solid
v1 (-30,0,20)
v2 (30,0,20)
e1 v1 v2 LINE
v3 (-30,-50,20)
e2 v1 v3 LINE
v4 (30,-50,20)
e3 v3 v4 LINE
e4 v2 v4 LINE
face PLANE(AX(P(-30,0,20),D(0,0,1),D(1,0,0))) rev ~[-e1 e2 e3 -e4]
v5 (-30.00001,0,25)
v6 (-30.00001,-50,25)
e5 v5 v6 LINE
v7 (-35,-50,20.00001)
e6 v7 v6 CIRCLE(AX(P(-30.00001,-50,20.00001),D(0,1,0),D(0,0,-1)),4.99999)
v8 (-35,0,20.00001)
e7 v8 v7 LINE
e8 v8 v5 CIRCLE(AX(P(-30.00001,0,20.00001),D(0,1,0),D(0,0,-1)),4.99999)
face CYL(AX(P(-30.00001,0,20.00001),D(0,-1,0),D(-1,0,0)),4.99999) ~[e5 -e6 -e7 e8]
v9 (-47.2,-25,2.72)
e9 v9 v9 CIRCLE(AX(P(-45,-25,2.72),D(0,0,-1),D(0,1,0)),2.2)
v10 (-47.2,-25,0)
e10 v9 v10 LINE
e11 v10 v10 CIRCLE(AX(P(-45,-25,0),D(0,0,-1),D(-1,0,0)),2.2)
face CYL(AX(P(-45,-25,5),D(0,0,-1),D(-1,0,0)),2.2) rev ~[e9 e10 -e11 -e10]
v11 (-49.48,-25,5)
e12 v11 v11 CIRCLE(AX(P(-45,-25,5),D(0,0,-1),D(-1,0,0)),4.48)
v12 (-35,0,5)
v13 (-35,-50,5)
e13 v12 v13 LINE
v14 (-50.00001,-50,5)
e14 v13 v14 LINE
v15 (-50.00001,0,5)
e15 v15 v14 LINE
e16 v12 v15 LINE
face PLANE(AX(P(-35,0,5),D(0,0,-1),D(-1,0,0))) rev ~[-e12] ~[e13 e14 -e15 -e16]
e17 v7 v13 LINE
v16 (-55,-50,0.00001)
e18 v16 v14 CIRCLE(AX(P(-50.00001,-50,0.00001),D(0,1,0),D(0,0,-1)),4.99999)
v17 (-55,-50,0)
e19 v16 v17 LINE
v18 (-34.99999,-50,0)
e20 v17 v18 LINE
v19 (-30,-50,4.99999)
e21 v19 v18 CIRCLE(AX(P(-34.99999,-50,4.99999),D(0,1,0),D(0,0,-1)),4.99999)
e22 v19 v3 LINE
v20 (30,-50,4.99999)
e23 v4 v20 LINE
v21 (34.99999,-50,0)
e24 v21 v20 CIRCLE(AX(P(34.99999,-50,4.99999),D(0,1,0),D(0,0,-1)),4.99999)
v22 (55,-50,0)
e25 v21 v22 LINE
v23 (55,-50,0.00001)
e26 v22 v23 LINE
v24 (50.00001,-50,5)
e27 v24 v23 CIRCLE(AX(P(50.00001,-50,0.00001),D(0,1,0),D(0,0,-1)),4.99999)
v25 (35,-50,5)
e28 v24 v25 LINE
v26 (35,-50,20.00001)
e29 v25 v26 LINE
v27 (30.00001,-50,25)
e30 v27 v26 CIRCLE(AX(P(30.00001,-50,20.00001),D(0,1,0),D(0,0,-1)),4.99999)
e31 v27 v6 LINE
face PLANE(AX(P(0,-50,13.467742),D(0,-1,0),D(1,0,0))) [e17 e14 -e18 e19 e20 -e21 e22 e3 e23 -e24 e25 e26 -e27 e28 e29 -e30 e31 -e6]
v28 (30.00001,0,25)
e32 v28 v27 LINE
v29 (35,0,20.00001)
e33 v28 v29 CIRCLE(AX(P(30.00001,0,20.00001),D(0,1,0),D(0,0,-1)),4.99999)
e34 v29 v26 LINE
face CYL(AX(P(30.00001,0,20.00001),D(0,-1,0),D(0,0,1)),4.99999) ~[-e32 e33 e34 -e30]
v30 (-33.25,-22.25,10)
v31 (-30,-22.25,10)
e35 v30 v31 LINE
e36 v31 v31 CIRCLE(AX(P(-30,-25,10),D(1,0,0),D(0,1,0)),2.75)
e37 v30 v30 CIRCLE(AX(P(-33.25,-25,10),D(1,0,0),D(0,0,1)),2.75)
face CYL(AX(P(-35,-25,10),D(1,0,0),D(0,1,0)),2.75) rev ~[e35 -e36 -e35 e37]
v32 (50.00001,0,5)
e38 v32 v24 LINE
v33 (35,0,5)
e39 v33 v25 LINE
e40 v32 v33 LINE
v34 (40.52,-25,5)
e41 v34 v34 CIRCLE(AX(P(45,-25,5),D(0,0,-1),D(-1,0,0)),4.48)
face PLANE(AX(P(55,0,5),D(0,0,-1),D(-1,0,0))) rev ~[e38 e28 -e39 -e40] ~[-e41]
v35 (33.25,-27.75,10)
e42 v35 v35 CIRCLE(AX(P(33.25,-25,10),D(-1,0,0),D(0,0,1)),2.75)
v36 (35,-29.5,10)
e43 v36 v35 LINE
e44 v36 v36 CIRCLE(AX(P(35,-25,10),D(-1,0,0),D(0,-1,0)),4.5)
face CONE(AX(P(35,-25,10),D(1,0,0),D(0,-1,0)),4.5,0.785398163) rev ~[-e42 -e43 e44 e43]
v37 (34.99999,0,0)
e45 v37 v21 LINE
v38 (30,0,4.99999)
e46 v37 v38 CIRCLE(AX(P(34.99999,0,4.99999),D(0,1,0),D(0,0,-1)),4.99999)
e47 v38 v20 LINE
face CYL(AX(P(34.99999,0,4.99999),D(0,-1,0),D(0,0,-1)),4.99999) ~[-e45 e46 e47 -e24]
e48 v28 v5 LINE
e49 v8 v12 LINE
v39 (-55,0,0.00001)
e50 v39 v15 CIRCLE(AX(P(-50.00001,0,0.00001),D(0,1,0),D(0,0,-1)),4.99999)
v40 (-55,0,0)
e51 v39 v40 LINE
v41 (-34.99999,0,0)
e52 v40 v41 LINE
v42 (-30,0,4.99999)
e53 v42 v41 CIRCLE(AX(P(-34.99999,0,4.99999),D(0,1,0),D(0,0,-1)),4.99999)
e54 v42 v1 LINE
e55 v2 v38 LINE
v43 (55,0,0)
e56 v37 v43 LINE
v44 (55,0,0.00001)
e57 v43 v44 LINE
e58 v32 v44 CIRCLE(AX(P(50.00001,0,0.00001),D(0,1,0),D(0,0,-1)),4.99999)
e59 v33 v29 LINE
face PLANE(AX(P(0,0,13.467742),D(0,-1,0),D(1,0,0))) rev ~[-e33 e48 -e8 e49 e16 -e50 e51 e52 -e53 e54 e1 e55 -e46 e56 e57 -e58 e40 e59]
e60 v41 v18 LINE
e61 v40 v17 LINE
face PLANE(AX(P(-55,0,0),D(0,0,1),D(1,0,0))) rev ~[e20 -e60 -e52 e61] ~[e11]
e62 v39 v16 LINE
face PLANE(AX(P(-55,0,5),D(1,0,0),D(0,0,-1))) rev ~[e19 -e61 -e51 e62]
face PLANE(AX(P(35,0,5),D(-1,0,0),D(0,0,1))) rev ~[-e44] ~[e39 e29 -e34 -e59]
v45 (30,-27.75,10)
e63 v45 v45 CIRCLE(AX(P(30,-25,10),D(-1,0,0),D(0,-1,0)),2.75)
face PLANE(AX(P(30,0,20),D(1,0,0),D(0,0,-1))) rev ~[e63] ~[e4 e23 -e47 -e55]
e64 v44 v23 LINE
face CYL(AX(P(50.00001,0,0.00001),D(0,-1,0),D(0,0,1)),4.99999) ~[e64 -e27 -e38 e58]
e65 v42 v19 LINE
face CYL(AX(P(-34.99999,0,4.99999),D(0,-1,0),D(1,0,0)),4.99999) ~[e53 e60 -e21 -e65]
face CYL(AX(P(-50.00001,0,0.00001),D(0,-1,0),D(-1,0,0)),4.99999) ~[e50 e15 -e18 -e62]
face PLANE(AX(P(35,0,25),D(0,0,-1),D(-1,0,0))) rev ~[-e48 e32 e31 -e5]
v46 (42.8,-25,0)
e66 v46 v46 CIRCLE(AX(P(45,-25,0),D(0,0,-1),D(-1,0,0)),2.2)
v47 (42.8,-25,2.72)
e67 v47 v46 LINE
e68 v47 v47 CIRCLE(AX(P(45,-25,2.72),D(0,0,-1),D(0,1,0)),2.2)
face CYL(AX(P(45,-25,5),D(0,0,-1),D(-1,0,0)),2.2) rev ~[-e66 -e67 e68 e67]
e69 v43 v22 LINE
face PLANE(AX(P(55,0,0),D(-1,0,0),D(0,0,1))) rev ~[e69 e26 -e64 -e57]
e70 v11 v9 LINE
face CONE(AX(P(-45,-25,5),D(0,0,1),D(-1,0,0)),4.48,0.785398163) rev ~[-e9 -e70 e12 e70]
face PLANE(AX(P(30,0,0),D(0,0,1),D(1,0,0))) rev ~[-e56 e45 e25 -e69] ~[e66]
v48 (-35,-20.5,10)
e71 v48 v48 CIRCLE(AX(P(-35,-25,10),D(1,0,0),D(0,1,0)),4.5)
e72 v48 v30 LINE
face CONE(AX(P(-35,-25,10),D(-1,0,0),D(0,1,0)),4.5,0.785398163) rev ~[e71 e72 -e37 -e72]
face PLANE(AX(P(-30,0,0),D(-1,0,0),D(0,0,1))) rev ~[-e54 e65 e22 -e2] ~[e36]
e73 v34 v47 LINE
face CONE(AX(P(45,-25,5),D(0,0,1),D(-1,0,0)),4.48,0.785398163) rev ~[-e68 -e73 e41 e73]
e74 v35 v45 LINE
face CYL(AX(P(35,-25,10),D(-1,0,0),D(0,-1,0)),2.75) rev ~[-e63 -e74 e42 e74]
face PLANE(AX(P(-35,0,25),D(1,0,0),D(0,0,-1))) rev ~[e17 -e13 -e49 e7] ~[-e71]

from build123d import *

# Parameters (mm, degrees)
F1_DEPTH             = 50
F4_D                 = 4.4
F4_CSINK_D           = 8.96
F4_CSINK_ANGLE       = 90
F4_ON_F3_D           = 4.4
F4_ON_F3_CSINK_D     = 8.96
F4_ON_F3_CSINK_ANGLE = 90
F6_D                 = 5.5
F6_DEPTH             = 5
F6_CSINK_D           = 9
F6_CSINK_ANGLE       = 90
F6_TIP               = 1.6523667023
F8_D                 = 5.5
F8_DEPTH             = 5
F8_CSINK_D           = 9
F8_CSINK_ANGLE       = 90
F8_TIP               = 1.6523667023
F9_R                 = 4.99999


# Not quite as in the source:
# - a fillet or chamfer is up to 0.001 mm smaller than in the source, because OpenCascade refuses the exact size


with BuildPart() as f1:
    # F0 (on Front) → F1 (new body)
    with BuildSketch(Plane.XZ):
        Polygon((-55, 5), (-55, 0), (-30, 0), (-30, 20), (30, 20), (30, 0), (55, 0), (55, 5), (35, 5), (35, 25), (-35, 25), (-35, 5), align=None)
    extrude(amount=F1_DEPTH)

    # F4 (through all)
    with Locations(Plane.XY.offset(5)):
        with Locations((-45, -25)):
            CounterSinkHole(F4_D / 2, F4_CSINK_D / 2, counter_sink_angle=F4_CSINK_ANGLE)

    # F4 on F3 (through all)
    with Locations(Plane.XY.offset(5)):
        with Locations((45, -25)):
            CounterSinkHole(F4_ON_F3_D / 2, F4_ON_F3_CSINK_D / 2, counter_sink_angle=F4_ON_F3_CSINK_ANGLE)

    # F6
    with Locations(Plane(origin=(-35, 0, 0), x_dir=(0, -1, 0), z_dir=(-1, 0, 0))):
        with Locations((25, 10)):
            CounterSinkHole(F6_D / 2, F6_CSINK_D / 2, depth=F6_DEPTH, counter_sink_angle=F6_CSINK_ANGLE)
            with Locations((0, 0, -(F6_DEPTH + F6_TIP / 2))):  # 118° drill point
                Cone(0, F6_D / 2, F6_TIP, mode=Mode.SUBTRACT)

    # F8
    with Locations(Plane.YZ.offset(35)):
        with Locations((-25, 10)):
            CounterSinkHole(F8_D / 2, F8_CSINK_D / 2, depth=F8_DEPTH, counter_sink_angle=F8_CSINK_ANGLE)
            with Locations((0, 0, -(F8_DEPTH + F8_TIP / 2))):  # 118° drill point
                Cone(0, F8_D / 2, F8_TIP, mode=Mode.SUBTRACT)

    # F9 (radius 5 in the source; OpenCascade refuses exactly that, so slightly less here)
    f9_edges = [f1.edges().sort_by_distance(p)[0] for p in [
        (-30, -25, 0),
        (30, -25, 0),
        (-55, -25, 5),
        (55, -25, 5),
        (-35, -25, 25),
        (35, -25, 25),
    ]]
    fillet(f9_edges, radius=F9_R)


solid = f1.part
